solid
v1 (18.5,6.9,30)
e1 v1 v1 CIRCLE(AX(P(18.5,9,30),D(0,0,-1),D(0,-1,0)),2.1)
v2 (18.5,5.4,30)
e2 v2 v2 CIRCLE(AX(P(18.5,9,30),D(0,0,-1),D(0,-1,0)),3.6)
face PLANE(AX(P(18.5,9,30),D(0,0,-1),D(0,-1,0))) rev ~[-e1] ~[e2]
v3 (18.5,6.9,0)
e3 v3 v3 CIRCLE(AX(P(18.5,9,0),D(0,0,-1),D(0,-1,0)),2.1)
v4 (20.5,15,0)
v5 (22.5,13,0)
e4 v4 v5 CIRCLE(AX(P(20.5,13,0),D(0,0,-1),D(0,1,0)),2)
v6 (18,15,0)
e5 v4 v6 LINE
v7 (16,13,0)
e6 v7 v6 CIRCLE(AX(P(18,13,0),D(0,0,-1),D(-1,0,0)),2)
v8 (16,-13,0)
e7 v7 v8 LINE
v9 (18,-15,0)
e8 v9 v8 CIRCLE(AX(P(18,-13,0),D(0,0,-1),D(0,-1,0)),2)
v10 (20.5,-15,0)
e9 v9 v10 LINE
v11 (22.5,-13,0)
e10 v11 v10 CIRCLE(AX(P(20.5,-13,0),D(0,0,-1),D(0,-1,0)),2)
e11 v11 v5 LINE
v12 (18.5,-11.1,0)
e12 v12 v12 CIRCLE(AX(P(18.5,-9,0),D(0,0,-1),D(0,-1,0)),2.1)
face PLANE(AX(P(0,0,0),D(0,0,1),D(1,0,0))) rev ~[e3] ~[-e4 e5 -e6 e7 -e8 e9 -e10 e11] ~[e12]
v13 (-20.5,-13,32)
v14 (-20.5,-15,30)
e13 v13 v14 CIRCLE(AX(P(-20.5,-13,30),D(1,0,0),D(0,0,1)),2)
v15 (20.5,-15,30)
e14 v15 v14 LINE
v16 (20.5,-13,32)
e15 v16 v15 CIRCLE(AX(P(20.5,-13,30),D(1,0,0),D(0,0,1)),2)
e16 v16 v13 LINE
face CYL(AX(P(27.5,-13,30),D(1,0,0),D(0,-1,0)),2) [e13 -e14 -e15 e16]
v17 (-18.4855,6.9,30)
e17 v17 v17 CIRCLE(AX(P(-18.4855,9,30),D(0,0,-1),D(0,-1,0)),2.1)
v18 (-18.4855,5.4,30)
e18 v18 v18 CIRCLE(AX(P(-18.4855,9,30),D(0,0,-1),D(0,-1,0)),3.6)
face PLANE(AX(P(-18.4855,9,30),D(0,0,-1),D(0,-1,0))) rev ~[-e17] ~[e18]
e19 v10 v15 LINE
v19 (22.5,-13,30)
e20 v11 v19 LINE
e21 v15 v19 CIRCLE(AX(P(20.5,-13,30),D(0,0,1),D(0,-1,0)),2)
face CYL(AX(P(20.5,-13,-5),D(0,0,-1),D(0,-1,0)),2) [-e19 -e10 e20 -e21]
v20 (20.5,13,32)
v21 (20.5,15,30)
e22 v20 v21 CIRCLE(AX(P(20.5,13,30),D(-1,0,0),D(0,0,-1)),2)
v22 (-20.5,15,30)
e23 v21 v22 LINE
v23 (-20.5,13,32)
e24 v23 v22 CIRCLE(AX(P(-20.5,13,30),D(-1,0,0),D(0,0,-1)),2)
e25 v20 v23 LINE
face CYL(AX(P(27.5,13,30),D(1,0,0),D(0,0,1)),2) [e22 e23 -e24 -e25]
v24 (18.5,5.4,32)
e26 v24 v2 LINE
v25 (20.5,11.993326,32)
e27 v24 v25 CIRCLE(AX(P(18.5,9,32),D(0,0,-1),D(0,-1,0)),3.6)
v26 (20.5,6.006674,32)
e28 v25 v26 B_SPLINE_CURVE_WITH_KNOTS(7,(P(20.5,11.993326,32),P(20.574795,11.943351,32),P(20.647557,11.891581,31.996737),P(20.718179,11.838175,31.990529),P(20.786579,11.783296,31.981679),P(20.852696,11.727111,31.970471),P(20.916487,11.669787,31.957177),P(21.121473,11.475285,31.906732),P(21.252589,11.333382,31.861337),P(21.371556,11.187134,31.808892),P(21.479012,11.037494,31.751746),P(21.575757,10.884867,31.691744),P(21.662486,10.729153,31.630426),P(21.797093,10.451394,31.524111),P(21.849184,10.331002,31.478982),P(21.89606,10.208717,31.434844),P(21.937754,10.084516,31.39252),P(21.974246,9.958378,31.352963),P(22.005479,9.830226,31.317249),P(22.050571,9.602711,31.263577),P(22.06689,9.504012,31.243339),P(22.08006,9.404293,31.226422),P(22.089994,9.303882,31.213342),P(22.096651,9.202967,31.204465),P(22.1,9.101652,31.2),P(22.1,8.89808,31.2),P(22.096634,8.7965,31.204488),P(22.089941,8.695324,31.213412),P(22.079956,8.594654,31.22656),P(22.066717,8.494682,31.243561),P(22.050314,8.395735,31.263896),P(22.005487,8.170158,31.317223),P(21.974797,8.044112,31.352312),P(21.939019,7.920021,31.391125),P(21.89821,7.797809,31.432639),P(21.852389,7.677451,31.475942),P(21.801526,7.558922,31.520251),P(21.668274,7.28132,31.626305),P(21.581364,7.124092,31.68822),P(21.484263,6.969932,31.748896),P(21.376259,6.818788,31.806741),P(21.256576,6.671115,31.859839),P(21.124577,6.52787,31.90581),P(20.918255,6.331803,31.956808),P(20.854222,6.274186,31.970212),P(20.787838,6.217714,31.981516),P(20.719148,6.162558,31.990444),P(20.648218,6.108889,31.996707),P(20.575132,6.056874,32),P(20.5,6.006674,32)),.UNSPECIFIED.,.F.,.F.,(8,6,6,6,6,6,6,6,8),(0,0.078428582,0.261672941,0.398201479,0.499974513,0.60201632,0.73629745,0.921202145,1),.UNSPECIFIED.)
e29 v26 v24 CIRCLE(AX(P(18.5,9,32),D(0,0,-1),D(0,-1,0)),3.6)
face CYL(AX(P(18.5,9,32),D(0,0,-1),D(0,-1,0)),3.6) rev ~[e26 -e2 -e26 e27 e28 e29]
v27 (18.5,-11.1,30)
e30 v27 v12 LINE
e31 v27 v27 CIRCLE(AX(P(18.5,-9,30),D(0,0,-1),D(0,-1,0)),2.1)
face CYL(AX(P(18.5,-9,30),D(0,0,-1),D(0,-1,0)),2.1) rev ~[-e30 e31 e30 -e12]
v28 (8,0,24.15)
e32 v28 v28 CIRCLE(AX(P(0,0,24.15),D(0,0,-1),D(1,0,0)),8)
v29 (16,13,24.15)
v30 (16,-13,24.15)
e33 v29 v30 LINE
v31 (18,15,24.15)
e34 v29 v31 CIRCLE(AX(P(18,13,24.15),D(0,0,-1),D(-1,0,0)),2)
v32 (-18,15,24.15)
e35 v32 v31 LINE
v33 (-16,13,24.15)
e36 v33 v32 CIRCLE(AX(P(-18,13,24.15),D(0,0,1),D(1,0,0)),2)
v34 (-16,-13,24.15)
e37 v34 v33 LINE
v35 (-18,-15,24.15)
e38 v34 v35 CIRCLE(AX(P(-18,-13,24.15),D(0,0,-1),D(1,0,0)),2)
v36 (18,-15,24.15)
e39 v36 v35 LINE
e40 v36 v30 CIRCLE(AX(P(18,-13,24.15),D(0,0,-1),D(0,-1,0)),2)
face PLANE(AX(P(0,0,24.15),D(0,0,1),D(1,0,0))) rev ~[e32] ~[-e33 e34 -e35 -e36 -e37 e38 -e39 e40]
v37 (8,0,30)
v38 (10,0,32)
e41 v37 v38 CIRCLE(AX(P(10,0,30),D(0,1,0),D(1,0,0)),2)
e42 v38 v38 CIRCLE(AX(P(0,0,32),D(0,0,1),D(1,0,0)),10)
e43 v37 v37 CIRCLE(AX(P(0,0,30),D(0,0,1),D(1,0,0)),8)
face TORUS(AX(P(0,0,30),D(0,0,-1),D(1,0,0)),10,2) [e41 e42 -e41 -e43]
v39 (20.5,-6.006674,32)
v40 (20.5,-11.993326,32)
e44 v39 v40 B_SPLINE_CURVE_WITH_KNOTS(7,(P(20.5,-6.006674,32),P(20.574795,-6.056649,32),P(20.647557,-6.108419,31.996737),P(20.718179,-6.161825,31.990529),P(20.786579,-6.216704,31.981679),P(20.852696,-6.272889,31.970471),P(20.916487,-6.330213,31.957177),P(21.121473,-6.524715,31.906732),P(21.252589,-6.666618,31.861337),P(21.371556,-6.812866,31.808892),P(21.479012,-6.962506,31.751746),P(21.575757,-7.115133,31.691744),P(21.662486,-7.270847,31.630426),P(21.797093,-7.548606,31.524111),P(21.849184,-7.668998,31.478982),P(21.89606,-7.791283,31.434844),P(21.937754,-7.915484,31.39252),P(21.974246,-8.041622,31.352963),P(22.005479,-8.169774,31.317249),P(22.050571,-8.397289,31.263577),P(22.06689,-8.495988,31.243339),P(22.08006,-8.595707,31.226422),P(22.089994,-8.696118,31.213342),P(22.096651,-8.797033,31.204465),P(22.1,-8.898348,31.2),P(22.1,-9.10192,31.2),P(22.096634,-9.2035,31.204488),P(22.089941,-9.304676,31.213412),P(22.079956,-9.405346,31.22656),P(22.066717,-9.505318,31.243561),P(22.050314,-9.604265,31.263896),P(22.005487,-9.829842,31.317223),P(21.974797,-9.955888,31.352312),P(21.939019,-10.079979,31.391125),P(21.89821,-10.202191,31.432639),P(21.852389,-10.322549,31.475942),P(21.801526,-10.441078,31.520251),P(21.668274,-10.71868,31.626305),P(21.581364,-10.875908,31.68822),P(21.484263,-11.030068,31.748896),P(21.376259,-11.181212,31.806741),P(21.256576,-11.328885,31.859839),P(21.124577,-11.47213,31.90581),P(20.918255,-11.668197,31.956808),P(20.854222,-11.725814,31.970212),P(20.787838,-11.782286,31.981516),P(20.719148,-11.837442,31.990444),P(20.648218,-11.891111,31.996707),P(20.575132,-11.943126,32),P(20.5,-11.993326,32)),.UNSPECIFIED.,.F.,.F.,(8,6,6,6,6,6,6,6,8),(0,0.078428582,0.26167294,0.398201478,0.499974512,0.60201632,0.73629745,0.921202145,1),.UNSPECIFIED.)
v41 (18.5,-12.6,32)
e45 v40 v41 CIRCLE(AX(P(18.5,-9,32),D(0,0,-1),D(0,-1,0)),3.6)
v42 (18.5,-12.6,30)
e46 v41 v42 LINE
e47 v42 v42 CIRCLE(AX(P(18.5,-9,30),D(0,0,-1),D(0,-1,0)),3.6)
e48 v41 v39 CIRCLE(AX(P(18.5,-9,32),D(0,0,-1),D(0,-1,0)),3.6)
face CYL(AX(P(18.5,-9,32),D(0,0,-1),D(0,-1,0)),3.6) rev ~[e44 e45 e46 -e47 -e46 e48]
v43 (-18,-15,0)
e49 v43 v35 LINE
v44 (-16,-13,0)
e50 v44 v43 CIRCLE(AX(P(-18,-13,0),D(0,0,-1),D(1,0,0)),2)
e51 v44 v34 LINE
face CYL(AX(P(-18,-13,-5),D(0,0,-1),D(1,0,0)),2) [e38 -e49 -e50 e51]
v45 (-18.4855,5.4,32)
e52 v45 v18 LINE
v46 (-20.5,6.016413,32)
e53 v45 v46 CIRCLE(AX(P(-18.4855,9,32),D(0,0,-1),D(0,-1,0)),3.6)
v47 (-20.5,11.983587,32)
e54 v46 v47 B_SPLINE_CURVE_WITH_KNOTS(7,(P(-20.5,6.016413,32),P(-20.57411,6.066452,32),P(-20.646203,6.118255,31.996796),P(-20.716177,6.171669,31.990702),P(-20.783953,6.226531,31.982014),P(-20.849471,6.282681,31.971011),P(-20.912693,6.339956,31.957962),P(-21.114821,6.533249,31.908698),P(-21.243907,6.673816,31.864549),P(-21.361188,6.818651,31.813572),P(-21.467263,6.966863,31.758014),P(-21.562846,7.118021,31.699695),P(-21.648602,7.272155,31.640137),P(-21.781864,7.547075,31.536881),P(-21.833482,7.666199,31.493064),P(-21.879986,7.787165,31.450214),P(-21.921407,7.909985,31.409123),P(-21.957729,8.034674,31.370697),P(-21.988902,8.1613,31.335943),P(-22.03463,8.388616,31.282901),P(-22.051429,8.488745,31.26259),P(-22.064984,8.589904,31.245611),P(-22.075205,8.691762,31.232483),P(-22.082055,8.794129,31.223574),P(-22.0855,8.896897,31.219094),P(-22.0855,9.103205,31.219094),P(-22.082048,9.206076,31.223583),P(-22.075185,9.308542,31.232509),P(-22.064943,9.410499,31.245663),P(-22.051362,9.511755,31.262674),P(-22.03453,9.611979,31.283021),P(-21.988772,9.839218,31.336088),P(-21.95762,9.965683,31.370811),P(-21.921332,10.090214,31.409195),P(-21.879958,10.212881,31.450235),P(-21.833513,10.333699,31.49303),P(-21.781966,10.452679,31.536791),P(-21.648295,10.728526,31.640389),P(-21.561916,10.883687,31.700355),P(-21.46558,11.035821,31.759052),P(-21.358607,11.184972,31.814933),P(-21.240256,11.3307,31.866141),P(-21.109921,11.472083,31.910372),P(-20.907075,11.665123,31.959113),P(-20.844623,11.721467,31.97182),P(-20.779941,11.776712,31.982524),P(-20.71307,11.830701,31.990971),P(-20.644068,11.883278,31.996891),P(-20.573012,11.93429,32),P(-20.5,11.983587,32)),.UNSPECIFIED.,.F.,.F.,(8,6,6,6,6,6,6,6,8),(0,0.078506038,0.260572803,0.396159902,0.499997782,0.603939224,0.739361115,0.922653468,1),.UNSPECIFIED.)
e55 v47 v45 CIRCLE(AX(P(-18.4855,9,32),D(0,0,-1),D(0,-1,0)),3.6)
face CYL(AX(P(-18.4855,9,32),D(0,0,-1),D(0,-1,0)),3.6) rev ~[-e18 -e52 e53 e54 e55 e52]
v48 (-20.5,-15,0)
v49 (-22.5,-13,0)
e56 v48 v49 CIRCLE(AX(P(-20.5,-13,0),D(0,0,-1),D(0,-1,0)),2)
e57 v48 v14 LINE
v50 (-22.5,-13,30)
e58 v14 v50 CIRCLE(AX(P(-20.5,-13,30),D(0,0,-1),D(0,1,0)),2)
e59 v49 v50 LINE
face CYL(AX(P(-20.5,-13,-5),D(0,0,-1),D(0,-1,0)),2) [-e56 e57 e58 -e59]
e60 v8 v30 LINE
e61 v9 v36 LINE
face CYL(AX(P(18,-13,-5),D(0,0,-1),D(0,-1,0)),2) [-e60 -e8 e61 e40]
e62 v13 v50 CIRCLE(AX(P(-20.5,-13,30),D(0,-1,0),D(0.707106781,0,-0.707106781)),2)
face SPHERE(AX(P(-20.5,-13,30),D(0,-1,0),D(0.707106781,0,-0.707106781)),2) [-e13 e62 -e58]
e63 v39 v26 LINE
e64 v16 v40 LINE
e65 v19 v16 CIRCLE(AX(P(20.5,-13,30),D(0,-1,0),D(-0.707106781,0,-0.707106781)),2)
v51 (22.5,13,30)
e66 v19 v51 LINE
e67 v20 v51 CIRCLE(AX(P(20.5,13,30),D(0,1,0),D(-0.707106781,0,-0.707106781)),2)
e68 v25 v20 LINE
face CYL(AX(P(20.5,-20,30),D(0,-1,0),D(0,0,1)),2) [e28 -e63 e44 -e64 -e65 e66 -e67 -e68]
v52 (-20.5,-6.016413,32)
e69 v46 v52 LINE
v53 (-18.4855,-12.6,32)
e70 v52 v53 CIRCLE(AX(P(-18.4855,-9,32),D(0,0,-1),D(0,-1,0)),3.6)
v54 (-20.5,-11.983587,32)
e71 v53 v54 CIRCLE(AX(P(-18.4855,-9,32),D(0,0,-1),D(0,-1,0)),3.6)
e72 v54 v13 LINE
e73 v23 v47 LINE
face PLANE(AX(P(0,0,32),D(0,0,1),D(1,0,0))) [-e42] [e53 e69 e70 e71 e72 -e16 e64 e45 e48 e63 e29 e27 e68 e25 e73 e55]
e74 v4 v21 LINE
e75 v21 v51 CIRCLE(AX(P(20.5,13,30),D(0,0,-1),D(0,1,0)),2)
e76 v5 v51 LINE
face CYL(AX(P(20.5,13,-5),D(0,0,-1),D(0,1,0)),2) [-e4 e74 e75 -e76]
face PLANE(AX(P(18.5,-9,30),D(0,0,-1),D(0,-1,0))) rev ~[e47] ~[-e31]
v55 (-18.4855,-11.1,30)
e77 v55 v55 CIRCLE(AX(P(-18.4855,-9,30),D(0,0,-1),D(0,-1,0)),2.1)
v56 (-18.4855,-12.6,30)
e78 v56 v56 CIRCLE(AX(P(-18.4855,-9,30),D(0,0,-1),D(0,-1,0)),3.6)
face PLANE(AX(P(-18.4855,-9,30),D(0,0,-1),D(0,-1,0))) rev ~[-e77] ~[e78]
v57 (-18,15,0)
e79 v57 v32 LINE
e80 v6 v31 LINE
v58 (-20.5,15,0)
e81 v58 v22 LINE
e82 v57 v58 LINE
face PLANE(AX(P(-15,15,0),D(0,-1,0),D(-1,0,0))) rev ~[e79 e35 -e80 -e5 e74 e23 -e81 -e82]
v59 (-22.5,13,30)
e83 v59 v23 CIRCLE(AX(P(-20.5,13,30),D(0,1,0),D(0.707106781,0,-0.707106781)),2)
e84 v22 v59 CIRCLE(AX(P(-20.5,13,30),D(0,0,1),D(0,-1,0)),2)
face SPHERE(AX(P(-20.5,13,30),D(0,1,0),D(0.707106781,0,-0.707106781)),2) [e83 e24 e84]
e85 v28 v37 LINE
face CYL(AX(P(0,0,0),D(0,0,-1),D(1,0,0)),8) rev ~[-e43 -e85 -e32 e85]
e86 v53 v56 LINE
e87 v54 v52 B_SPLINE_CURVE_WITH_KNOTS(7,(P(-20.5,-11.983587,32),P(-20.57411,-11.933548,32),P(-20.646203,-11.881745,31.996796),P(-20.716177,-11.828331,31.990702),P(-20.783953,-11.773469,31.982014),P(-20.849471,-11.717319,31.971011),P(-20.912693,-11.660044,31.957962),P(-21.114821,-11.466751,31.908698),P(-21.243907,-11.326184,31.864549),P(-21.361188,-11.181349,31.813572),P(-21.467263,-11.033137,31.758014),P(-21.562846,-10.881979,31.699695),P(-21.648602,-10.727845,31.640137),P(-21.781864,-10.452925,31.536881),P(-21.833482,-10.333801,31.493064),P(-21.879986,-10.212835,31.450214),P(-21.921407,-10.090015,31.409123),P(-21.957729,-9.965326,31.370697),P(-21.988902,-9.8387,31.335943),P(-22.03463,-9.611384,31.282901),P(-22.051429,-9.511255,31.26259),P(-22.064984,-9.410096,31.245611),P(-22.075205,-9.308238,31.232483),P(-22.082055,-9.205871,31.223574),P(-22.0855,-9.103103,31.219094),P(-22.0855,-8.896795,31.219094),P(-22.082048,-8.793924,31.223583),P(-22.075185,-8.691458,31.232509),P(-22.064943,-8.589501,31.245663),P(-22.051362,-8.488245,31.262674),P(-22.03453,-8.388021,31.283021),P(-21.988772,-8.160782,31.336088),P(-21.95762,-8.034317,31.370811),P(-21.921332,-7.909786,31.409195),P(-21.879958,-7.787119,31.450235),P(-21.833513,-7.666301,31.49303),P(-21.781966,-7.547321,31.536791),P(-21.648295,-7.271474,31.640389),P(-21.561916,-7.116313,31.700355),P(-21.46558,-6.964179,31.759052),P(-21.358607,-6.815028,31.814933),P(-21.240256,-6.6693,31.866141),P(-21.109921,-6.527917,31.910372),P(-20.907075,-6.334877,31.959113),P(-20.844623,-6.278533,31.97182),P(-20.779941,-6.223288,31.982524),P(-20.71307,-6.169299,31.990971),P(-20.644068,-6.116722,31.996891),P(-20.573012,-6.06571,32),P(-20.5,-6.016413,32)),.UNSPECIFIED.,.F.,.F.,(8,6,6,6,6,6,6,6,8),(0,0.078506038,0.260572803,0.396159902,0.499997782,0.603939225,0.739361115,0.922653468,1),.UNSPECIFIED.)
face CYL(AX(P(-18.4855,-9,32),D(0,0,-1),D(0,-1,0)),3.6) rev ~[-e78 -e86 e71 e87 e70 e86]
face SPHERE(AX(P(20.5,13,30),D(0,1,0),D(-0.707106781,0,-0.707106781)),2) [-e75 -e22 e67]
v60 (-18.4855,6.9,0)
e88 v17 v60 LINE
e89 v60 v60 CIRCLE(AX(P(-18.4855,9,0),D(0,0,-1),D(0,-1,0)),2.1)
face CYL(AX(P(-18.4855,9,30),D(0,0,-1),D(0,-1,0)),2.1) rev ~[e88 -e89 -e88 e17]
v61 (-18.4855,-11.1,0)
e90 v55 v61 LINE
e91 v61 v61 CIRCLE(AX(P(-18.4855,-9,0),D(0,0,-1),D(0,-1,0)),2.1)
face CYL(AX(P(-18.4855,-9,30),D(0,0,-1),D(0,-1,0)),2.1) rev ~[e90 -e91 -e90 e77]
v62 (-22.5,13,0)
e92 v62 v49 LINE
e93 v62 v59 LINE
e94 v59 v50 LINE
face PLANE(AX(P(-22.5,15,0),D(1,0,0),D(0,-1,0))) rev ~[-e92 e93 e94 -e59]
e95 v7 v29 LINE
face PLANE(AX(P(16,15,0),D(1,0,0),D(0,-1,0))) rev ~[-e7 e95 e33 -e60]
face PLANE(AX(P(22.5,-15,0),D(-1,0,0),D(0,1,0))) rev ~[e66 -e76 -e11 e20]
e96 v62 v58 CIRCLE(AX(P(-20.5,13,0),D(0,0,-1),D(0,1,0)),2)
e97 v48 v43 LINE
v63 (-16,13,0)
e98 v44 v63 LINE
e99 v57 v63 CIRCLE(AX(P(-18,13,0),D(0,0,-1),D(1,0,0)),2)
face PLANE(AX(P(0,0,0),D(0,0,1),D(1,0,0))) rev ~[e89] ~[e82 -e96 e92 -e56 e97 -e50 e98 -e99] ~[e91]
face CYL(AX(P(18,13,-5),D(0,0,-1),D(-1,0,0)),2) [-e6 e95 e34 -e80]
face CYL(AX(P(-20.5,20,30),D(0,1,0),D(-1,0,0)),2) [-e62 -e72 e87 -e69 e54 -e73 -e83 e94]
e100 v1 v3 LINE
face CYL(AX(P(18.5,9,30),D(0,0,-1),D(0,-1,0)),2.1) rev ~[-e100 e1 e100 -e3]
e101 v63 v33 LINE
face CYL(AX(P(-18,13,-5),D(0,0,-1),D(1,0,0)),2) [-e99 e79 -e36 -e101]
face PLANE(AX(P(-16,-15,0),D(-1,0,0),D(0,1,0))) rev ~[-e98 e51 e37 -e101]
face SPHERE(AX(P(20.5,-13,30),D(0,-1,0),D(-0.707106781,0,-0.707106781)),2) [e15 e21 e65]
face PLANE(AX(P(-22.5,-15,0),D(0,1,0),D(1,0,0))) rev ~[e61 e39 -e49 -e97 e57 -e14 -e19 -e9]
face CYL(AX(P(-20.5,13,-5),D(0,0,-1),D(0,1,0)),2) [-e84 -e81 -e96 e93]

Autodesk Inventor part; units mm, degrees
ref_plane "YZ Plane" through (0, 0, 0) normal (1, 0, 0) x (0, 1, 0)
ref_plane "XZ Plane" through (0, 0, 0) normal (0, 1, 0) x (-1, 0, 0)
sketch "Skizze1" plane through (0, 0, 0) normal (0, 0, 1) x (1, 0, 0)
  circle A0 centre (0, 0) radius 8 construction
  line L0 (-30, -17.5) -> (30, -17.5) construction
  line L1 (30, -17.5) -> (30, 17.5) construction
  line L2 (30, 17.5) -> (-30, 17.5) construction
  line L3 (-30, 17.5) -> (-30, -17.5) construction
  circle A1 centre (0, 0) radius 9 construction
  circle A2 centre (0, 0) radius 14 construction
  line L4 (-15, -15) -> (15, -15)
  line L5 (15, 15) -> (-15, 15)
  line L6 (-15, -15) -> (15, 15) construction
  line L7 (15, -15) -> (-15, 15) construction
  line L8 (-22.5, -15) -> (22.5, -15)
  line L9 (22.5, -15) -> (22.5, 15)
  line L10 (22.5, 15) -> (-22.5, 15)
  line L11 (-22.5, 15) -> (-22.5, -15)
  line L12 (-22.5, -15) -> (22.5, 15) construction
  line L13 (22.5, -15) -> (-22.5, 15) construction
  circle A3 centre (0, 0) radius 8
  point P0 (0, 0)
extrude "Extrusion1" add sketch "Skizze1" along normal blind 32
ref_plane "Arbeitsebene1" through (0, 0, 0) normal (0, 0, 1) x (1, 0, 0)
sketch "Skizze2" plane through (0, 0, 0) normal (0, 0, 1) x (1, 0, 0)
  circle A0 centre (0, 0) radius 13.8 construction
  circle A1 centre (0, 0) radius 14 construction
  line L0 (22.5, 15) -> (-22.5, 15) construction
  line L1 (22.5, -15) -> (22.5, 15) construction
  line L2 (-22.5, -15) -> (22.5, -15) construction
  line L3 (-22.5, 15) -> (-22.5, -15) construction
  line L4 (-22.5, -15) -> (22.5, -15) projected
  line L5 (-16, 15) -> (16, 15)
  line L6 (16, 15) -> (16, -15)
  line L7 (16, -15) -> (-16, -15)
  line L8 (-16, -15) -> (-16, 15)
  line L9 (-16, 15) -> (16, -15) construction
  line L10 (16, 15) -> (-16, -15) construction
  point P0 (0, 0)
  dimension "d5" = 32
ref_plane "Arbeitsebene2" through (-7.2804, -7.2804, 24.15) normal (0, 0, -1) x (-0.0257355, 0.9996688, 0)
extrude "Extrusion2" cut sketch "Skizze2" along normal up to surface (24.15 mm away)
sketch "Skizze3" plane through (0, 0, 32) normal (0, 0, 1) x (1, 0, 0)
  circle A0 centre (0, 0) radius 8 construction
  line L0 (-22.5, -15) -> (22.5, -15) construction
  line L1 (22.5, -15) -> (22.5, 15) construction
  line L2 (22.5, 15) -> (-22.5, 15) construction
  line L3 (-22.5, 15) -> (-22.5, -15) construction
  line L4 (16, -15) -> (16, 15) construction
  line L5 (-16, 15) -> (-16, -15) construction
  line L6 (22.5, -11.8361) -> (18.5, -11.8361) construction
  line L7 (16, -15) -> (22.5, -15) construction
  line L8 (18.5, -15) -> (18.5, -9) construction
  line L9 (22.5, 15) -> (-22.5, 15) construction
  line L10 (18.5, 15) -> (18.5, 9) construction
  line L11 (-22.5, 15) -> (-22.5, -15) construction
  line L12 (-22.5, -9) -> (-18.4855, -9) construction
  line L13 (-22.5, 9) -> (-18.4855, 9) construction
  point P0 (0, 0)
  dimension "d9" = 4
  dimension "d10" = 6
  dimension "d11" = 6
hole "Bohrung1" at (18.5, -9, 32) at (18.5, 9, 32) at (-18.4855, -9, 32) at (-18.4855, 9, 32) direction (0, 0, -1) diameter 4.2 end through all counterbore diameter 7.2 counterbore depth 2
fillet "Rundung1" radius 2 4 edges at (0, -15, 32) (22.5, 0, 32) (0, 15, 32) (-22.5, 0, 32)
fillet "Rundung2" radius 2 1 edges at (-8, 0, 32)
fillet "Rundung3" radius 2 12 edges at (21.9142, 14.4142, 31.4142) (22.5, 15, 15) (16, 15, 12.075) (-16, 15, 12.075) (-21.9142, 14.4142, 31.4142) (-22.5, 15, 15) (21.9142, -14.4142, 31.4142) (22.5, -15, 15) (-21.9142, -14.4142, 31.4142) (-22.5, -15, 15) (-16, -15, 12.075) (16, -15, 12.075)
properties part number "Upper_bearing_support_outside"
